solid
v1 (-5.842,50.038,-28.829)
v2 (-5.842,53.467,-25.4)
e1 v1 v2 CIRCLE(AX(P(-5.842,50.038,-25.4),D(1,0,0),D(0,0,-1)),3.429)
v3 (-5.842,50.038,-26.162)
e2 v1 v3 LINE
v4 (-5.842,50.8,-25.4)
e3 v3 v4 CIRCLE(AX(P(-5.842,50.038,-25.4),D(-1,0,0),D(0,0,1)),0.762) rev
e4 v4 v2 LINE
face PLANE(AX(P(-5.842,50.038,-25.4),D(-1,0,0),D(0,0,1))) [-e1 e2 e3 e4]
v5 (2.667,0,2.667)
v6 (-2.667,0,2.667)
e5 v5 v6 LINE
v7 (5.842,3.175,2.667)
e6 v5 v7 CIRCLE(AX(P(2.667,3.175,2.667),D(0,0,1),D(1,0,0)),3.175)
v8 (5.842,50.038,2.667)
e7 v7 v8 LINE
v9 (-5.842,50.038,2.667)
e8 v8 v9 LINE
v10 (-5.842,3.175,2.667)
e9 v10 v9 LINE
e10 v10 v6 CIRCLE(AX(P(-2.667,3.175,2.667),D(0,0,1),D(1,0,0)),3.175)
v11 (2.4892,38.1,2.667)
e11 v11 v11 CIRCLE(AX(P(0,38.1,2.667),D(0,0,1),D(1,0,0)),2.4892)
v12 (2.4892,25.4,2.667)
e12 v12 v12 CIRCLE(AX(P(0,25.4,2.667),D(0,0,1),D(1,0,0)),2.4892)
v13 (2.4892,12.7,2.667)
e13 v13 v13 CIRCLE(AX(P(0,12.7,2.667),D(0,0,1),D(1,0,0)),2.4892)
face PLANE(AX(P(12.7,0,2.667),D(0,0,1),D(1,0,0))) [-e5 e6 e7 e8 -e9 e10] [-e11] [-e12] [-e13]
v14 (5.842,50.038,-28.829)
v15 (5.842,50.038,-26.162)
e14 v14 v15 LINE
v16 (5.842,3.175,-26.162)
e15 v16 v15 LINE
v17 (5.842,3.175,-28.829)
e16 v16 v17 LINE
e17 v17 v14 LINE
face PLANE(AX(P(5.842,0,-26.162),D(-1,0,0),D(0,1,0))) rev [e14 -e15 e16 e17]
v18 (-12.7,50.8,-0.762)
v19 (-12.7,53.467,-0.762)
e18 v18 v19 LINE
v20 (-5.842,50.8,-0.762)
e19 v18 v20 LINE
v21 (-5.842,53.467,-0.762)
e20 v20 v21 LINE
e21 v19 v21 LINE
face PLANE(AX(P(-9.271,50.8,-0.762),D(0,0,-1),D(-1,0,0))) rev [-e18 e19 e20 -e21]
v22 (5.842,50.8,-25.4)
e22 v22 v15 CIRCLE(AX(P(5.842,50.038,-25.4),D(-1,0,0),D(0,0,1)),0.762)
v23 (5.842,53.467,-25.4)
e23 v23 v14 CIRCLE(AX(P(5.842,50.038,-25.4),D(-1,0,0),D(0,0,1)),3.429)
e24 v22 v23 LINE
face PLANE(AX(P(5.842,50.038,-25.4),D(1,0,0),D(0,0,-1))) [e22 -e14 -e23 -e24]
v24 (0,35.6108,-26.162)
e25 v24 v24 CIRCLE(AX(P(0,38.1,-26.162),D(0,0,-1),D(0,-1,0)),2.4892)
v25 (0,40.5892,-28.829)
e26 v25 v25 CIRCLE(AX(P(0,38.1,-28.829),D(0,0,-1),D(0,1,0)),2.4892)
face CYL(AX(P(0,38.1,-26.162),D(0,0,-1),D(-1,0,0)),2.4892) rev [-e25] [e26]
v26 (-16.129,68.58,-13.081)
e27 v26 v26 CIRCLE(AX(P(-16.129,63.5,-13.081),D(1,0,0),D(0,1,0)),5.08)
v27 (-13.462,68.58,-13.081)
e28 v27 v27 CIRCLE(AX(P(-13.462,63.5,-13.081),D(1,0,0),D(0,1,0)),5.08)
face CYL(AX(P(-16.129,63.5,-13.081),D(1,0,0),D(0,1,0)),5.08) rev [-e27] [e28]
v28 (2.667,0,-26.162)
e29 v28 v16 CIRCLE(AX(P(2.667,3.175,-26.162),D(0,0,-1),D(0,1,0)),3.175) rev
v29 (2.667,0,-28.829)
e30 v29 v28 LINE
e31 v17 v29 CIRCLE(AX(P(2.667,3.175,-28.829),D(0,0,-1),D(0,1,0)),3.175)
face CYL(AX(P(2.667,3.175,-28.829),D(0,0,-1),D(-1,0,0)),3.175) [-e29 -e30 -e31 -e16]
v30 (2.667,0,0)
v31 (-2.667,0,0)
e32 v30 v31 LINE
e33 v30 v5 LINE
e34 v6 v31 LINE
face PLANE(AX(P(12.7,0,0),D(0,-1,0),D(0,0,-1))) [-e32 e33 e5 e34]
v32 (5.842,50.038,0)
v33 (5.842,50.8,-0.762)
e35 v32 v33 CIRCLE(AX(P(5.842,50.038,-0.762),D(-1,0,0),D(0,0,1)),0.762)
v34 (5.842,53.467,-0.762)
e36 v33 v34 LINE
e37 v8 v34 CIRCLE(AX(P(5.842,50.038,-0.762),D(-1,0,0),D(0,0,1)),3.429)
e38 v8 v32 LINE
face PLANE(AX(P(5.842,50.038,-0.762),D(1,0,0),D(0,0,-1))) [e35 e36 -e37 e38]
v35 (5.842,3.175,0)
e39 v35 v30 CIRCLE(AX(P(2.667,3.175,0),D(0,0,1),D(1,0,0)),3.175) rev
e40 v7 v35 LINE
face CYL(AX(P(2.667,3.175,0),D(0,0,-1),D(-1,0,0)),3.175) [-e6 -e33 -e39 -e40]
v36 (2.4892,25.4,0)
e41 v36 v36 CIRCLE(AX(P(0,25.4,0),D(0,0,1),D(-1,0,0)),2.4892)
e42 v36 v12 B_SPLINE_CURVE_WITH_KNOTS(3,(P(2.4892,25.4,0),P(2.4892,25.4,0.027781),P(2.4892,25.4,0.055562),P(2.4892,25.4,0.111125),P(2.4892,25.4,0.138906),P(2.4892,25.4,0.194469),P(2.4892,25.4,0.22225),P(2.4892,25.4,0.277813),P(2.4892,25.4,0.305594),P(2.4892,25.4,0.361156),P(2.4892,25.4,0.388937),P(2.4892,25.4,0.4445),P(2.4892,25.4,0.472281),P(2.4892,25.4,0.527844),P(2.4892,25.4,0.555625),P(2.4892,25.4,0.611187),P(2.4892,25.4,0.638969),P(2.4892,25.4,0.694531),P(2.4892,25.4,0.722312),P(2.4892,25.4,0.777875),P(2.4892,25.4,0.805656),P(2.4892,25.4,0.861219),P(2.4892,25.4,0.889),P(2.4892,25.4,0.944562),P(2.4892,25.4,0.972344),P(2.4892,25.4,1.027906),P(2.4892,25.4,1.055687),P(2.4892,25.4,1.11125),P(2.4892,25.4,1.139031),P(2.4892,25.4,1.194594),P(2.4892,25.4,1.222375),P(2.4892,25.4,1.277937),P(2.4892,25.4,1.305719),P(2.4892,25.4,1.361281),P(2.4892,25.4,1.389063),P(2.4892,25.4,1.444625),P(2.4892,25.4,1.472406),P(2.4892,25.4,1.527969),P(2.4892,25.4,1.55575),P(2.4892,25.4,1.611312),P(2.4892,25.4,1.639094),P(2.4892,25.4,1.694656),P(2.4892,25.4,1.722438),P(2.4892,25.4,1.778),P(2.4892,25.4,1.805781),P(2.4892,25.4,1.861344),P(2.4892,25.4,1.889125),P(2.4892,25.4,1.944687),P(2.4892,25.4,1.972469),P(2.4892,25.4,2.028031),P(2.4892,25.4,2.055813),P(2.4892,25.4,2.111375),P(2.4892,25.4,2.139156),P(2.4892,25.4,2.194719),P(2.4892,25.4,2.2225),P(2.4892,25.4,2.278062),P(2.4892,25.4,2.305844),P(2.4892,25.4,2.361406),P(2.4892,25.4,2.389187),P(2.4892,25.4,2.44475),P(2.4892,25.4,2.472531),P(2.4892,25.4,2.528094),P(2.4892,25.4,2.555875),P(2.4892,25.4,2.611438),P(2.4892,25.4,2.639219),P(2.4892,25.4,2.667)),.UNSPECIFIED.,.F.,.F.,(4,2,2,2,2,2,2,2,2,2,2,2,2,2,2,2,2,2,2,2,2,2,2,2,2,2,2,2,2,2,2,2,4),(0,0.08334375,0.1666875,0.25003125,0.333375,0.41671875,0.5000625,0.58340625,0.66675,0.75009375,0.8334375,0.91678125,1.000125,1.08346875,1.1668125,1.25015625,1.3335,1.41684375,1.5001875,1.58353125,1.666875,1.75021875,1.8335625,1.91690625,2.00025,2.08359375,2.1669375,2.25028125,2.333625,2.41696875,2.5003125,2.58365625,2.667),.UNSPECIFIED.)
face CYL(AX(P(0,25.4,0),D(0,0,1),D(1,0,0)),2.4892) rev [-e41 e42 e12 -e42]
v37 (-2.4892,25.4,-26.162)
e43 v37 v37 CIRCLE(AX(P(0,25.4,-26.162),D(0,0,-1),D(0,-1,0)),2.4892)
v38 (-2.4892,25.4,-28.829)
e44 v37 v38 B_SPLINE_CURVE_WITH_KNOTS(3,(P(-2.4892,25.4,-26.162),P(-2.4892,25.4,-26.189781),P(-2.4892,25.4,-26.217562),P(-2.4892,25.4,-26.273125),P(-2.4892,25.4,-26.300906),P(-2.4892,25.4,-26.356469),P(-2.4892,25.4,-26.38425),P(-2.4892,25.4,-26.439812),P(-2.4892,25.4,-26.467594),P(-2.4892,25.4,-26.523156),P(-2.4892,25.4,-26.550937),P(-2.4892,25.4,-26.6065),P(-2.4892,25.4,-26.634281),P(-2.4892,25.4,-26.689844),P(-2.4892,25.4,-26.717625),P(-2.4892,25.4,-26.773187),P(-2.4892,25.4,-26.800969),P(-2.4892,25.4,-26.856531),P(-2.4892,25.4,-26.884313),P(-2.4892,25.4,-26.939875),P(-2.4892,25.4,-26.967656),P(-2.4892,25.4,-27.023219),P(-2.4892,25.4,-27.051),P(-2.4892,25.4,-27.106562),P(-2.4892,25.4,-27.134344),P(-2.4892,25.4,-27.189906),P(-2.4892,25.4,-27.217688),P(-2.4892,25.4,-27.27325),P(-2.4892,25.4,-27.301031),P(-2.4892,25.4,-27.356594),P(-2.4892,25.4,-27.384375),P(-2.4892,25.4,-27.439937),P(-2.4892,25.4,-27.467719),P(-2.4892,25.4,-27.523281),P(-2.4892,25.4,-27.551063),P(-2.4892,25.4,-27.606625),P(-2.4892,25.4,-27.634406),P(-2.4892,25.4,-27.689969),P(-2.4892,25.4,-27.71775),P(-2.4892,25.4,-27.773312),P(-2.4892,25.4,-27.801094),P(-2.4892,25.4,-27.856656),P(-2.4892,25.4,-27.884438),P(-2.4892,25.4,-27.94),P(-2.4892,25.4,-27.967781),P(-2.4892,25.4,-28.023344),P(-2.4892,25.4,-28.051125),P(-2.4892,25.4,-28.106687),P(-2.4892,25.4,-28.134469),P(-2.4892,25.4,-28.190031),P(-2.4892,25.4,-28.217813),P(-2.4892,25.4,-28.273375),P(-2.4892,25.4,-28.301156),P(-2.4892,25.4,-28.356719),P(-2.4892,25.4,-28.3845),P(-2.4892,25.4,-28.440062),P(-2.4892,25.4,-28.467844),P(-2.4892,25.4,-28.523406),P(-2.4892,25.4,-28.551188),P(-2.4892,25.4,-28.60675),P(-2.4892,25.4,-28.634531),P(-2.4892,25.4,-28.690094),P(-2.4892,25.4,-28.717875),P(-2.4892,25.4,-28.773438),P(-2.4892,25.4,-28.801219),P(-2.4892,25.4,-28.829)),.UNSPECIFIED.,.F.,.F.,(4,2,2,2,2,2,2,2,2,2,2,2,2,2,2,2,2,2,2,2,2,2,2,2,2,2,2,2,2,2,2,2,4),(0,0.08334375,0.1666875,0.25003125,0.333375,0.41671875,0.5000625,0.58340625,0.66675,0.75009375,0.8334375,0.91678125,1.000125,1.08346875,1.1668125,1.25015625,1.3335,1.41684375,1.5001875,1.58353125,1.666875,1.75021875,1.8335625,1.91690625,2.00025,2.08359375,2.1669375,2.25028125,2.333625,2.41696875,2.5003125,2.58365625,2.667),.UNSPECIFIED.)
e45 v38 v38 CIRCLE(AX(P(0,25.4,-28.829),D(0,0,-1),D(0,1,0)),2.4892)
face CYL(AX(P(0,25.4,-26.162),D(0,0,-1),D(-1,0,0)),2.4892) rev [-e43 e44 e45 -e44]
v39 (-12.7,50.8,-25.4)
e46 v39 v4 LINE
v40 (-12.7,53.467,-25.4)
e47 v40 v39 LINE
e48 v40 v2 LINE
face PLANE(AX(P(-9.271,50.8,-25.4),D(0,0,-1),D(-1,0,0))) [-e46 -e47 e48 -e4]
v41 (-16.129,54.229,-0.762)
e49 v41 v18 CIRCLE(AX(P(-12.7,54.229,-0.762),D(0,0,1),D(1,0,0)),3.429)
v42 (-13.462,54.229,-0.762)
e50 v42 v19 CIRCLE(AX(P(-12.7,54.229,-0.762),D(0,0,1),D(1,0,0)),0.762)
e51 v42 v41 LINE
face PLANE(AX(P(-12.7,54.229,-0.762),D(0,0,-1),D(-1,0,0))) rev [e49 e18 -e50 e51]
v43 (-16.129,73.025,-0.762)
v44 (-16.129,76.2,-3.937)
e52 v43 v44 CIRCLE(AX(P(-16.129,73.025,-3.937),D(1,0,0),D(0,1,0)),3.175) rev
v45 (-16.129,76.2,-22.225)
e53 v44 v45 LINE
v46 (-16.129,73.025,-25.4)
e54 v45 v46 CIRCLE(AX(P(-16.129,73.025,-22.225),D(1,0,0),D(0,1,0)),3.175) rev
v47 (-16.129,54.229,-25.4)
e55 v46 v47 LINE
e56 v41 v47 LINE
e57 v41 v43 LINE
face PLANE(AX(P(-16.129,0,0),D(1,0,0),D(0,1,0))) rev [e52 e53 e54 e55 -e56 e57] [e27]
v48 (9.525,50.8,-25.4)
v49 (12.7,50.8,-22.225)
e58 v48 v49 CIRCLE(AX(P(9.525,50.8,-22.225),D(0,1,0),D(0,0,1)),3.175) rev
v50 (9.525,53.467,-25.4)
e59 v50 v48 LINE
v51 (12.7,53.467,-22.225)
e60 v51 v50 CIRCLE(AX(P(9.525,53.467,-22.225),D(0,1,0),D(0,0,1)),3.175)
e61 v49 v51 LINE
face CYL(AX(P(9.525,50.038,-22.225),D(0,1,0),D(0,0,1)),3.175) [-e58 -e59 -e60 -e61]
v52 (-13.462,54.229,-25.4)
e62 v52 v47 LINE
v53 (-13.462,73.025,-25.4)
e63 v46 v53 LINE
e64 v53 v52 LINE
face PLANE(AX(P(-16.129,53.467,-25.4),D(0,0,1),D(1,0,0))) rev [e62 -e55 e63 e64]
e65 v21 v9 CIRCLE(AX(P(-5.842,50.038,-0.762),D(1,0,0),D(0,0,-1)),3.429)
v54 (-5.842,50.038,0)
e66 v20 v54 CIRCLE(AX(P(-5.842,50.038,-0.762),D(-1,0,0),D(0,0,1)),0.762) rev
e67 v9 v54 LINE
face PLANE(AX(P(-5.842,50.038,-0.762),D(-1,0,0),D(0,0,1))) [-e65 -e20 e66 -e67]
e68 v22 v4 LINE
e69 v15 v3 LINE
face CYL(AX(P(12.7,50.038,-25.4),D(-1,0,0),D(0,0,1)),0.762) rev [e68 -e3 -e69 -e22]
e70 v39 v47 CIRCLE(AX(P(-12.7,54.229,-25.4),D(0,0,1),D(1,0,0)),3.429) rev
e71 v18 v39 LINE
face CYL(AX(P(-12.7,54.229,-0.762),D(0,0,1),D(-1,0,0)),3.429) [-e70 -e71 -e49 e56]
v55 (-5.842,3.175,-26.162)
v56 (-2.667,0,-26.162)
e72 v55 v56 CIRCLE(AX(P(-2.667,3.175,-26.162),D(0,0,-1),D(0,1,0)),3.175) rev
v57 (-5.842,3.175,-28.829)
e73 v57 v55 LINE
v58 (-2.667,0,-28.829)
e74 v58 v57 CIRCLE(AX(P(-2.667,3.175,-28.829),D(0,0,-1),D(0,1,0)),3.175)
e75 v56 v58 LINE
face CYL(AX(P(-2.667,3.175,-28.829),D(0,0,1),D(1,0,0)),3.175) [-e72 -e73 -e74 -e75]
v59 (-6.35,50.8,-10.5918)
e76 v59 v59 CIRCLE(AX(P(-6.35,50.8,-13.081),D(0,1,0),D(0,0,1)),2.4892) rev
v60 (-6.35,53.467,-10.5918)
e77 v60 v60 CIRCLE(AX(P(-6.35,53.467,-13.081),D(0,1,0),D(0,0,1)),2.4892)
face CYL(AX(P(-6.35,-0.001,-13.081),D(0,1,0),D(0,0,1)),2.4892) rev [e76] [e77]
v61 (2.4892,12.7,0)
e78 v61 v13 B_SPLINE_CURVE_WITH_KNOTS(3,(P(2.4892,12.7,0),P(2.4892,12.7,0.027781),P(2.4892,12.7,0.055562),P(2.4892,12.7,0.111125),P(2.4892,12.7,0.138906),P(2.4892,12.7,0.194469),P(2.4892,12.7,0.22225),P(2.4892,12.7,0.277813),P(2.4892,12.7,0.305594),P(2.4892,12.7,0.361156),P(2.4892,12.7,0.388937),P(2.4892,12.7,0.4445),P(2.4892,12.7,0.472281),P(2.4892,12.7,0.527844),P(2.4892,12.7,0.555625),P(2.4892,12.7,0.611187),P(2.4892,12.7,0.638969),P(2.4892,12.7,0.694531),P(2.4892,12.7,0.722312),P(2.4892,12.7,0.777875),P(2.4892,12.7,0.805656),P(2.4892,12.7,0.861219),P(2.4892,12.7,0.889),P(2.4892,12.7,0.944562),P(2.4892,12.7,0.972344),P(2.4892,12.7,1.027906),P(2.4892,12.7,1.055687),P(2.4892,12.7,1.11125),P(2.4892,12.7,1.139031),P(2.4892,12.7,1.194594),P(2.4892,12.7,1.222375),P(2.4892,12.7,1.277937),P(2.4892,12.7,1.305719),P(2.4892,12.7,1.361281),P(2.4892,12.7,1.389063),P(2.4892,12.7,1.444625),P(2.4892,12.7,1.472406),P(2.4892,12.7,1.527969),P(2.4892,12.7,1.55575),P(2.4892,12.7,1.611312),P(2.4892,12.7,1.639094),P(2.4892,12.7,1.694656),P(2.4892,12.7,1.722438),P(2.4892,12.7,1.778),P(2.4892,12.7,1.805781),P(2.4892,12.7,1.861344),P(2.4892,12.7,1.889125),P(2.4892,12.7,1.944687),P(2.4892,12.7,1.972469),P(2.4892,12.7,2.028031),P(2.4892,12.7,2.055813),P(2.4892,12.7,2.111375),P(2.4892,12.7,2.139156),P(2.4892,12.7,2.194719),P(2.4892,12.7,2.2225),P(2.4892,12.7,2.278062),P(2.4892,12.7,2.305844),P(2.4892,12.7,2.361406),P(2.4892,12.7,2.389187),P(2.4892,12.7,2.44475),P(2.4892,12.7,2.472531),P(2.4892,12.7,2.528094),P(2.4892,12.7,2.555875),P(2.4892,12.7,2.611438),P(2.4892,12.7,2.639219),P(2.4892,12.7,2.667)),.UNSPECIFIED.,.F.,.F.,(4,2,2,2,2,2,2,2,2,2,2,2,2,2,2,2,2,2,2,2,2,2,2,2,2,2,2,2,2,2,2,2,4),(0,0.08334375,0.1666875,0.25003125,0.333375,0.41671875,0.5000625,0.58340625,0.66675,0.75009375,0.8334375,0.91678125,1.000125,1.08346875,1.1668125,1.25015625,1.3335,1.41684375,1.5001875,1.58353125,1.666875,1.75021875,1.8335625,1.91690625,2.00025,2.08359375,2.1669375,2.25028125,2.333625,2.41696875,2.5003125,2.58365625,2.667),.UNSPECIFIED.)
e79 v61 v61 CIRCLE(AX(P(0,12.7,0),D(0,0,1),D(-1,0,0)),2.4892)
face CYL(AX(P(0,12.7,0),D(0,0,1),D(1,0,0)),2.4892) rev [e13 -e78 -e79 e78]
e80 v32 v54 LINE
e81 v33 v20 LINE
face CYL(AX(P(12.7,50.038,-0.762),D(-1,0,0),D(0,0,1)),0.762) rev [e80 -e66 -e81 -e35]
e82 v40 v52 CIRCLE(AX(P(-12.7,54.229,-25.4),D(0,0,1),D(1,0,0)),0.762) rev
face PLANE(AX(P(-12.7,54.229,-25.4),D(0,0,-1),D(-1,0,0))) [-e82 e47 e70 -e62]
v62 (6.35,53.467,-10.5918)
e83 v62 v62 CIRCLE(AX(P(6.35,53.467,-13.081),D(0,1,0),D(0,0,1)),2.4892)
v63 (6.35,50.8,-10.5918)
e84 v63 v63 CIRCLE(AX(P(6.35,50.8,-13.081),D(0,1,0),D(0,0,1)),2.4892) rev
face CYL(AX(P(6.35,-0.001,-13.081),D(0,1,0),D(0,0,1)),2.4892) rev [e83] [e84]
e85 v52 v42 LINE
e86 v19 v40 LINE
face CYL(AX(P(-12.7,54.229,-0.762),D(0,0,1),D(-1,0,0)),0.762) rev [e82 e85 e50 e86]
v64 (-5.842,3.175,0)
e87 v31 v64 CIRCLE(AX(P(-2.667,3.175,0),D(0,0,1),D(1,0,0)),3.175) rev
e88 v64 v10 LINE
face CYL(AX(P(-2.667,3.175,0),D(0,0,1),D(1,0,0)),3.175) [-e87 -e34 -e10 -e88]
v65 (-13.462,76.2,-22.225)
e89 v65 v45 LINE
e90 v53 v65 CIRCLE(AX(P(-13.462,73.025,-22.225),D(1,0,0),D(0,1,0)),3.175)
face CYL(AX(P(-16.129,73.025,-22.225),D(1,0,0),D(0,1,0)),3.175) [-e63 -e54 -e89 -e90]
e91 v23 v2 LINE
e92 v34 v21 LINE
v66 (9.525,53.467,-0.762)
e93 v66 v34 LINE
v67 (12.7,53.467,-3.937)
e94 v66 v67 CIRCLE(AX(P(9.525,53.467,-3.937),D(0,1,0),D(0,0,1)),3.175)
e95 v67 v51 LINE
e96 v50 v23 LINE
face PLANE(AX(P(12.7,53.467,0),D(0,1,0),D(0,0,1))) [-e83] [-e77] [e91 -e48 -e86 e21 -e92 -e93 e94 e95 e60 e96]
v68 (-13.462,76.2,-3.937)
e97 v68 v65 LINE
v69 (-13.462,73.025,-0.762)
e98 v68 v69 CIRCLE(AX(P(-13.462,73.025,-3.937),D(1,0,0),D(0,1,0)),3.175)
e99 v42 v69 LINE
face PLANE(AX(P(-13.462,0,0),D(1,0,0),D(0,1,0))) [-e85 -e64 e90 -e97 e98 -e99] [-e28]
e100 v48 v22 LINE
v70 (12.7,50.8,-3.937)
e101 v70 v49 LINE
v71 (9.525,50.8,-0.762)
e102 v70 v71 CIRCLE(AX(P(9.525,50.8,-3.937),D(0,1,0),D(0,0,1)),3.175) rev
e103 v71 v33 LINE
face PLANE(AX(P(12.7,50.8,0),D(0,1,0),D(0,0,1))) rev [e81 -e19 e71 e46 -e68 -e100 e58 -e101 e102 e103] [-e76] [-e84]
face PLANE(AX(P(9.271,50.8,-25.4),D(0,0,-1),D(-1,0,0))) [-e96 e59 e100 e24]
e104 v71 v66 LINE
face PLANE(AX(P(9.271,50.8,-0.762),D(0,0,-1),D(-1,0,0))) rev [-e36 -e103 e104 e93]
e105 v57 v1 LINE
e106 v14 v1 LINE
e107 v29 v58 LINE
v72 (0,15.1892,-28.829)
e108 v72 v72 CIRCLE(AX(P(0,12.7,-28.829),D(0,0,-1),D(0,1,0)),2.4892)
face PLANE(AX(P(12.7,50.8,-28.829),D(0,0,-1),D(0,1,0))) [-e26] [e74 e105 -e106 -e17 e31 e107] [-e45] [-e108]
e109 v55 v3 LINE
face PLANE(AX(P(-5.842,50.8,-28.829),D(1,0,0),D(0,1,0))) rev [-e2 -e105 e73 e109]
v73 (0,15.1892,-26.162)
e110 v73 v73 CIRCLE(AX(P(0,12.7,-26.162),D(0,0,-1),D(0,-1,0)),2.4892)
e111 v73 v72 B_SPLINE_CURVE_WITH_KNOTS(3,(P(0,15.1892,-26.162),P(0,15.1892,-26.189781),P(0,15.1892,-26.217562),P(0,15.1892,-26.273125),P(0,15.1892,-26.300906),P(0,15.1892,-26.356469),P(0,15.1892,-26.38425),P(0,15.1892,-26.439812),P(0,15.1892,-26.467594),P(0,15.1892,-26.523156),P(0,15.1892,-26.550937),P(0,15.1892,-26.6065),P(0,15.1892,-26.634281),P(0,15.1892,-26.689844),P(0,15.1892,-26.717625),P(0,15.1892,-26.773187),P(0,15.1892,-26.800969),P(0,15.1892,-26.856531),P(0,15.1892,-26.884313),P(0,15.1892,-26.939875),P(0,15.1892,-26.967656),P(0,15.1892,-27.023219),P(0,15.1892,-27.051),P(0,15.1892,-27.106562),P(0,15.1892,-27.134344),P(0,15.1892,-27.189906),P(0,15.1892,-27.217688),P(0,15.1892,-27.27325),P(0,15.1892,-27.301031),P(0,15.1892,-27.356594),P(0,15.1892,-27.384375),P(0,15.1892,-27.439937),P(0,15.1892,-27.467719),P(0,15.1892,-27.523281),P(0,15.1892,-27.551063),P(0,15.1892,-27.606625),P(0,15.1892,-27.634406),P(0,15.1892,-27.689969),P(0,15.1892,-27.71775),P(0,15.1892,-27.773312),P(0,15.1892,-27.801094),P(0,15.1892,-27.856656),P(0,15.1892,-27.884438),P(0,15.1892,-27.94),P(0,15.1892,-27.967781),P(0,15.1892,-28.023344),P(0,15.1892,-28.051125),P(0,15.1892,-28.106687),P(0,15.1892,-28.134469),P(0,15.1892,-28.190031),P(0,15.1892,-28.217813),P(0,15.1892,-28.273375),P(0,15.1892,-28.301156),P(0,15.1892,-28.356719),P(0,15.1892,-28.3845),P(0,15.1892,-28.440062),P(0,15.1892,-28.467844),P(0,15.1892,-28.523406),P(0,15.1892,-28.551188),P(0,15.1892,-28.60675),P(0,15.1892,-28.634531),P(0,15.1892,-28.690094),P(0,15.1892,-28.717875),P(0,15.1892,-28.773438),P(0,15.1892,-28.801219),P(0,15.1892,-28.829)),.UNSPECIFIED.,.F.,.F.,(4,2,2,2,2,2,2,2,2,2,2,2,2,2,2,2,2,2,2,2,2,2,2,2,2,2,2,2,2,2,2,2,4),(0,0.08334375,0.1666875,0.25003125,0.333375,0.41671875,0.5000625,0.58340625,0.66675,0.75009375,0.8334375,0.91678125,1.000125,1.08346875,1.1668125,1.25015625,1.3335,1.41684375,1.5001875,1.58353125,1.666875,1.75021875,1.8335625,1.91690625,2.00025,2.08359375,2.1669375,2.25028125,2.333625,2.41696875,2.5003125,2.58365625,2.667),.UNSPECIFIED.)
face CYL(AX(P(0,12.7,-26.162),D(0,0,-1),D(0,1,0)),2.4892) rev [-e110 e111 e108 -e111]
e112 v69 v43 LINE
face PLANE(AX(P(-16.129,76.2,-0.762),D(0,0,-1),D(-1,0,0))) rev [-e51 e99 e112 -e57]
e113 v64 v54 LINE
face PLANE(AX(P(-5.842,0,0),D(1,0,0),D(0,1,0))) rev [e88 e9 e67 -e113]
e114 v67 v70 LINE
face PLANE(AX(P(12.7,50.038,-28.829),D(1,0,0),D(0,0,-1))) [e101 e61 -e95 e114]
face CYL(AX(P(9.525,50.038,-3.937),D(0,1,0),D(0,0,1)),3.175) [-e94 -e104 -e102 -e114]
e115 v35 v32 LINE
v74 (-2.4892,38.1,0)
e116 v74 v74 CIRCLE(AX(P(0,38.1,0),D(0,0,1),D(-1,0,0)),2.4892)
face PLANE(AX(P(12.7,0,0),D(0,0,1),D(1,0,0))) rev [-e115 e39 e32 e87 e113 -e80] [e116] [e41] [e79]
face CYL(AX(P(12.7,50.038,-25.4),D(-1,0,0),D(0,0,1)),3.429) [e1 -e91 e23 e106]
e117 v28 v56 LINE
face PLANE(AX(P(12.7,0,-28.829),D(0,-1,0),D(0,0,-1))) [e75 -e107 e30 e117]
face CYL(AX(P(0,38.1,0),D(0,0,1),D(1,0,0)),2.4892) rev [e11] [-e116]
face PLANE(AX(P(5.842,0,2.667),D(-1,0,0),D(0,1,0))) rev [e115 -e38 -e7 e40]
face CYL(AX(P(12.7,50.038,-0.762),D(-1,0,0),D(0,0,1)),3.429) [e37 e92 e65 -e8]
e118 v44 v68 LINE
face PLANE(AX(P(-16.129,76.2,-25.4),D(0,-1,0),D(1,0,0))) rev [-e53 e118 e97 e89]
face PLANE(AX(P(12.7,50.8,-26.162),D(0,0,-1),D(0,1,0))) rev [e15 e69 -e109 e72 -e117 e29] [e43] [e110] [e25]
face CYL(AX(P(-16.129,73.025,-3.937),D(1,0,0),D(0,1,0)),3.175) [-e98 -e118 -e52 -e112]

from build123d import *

# Parameters (mm, degrees)
BASE_FLANGE1_START       = -12.7
BASE_FLANGE1_DEPTH       = 25.4
EDGE_FLANGE1_DEPTH       = 24.638
SKETCH9_R                = 5.08
CUT_EXTRUDE1_DEPTH       = 86.568694538
CUT_EXTRUDE2_START       = -12.7
CUT_EXTRUDE2_DEPTH       = 6.858
CUT_EXTRUDE2_START_2     = 5.842
CUT_EXTRUDE2_2_DEPTH     = 6.858
CUT_EXTRUDE2_START_3     = -28.829
CUT_EXTRUDE2_3_OUTLINE_R = 2.4892
CUT_EXTRUDE2_3_DEPTH     = 31.496
CUT_EXTRUDE3_REACH       = 64.849
SKETCH11_R               = 2.4892
FILLET1_R                = 3.175


with BuildPart() as part:
    # Base-Flange1: read off the stored shape, not the designer's step
    # Base-Flange1 outline → Base-Flange1 (new body)
    with BuildSketch(Plane(origin=(0, 0, 0), x_dir=(0, 0, -1), z_dir=(1, 0, 0)).offset(BASE_FLANGE1_START)):
        with BuildLine():
            Line((26.162, 50.038), (26.162, 0))
            Line((26.162, 0), (28.829, 0))
            Line((28.829, 0), (28.829, 50.038))
            ThreePointArc((28.829, 50.038), (27.824669153, 52.462669153), (25.4, 53.467))
            Line((25.4, 53.467), (0.762, 53.467))
            ThreePointArc((0.762, 53.467), (-1.662669153, 52.462669153), (-2.667, 50.038))
            Line((-2.667, 50.038), (-2.667, 0))
            Line((-2.667, 0), (0, 0))
            Line((0, 0), (0, 50.038))
            ThreePointArc((0, 50.038), (0.223184633, 50.576815367), (0.762, 50.8))
            Line((0.762, 50.8), (25.4, 50.8))
            ThreePointArc((25.4, 50.8), (25.938815367, 50.576815367), (26.162, 50.038))
        make_face()
    extrude(amount=BASE_FLANGE1_DEPTH)

    # Edge-Flange1: sheet metal written as solids
    # Edge-Flange1 section (on a plane across the edge) → Edge-Flange1 (add)
    with BuildSketch(Plane(origin=(-13.462, 53.467, -25.4), x_dir=(1, 0, 0), z_dir=(0, 0, 1))):
        with BuildLine():
            Line((-2.667, 0.762), (-2.667, 22.733))
            Line((-2.667, 22.733), (0, 22.733))
            Line((0, 22.733), (0, 0.762))
            ThreePointArc((0, 0.762), (0.223184633, 0.223184633), (0.762, 0))
            Line((0.762, 0), (0.762, -2.667))
            ThreePointArc((0.762, -2.667), (-1.662669153, -1.662669153), (-2.667, 0.762))
        make_face()
    extrude(amount=EDGE_FLANGE1_DEPTH)

    # Sketch9 → Cut-Extrude1 (cut, through all)
    with BuildSketch(Plane(origin=(-13.462, 0, 0), x_dir=(0, 0, -1), z_dir=(1, 0, 0))):
        with Locations(Location((13.081, 63.5, 0), (0, 0, 90))):
            Circle(SKETCH9_R)
    extrude(amount=-CUT_EXTRUDE1_DEPTH, mode=Mode.SUBTRACT)

    # Cut-Extrude2: read off the stored shape, not the designer's step
    # Cut-Extrude2 outline → Cut-Extrude2 (cut)
    with BuildSketch(Plane.YZ.offset(CUT_EXTRUDE2_START)):
        with BuildLine():
            Line((53.467, -25.4), (50.8, -25.4))
            ThreePointArc((50.8, -25.4), (50.576815367, -25.938815367), (50.038, -26.162))
            Line((50.038, -26.162), (0, -26.162))
            Line((0, -26.162), (0, -28.829))
            Line((0, -28.829), (50.038, -28.829))
            ThreePointArc((50.038, -28.829), (52.462669153, -27.824669153), (53.467, -25.4))
        make_face()
        with BuildLine():
            ThreePointArc((50.038, 0), (50.576815367, -0.223184633), (50.8, -0.762))
            Line((50.8, -0.762), (53.467, -0.762))
            ThreePointArc((53.467, -0.762), (52.462669153, 1.662669153), (50.038, 2.667))
            Line((50.038, 2.667), (0, 2.667))
            Line((0, 2.667), (0, 0))
            Line((0, 0), (50.038, 0))
        make_face()
    extrude(amount=CUT_EXTRUDE2_DEPTH, mode=Mode.SUBTRACT)

    # Cut-Extrude2 2 outline → Cut-Extrude2 2 (cut)
    with BuildSketch(Plane.YZ.offset(CUT_EXTRUDE2_START_2)):
        with BuildLine():
            Line((53.467, -25.4), (50.8, -25.4))
            ThreePointArc((50.8, -25.4), (50.576815367, -25.938815367), (50.038, -26.162))
            Line((50.038, -26.162), (0, -26.162))
            Line((0, -26.162), (0, -28.829))
            Line((0, -28.829), (50.038, -28.829))
            ThreePointArc((50.038, -28.829), (52.462669153, -27.824669153), (53.467, -25.4))
        make_face()
        with BuildLine():
            ThreePointArc((50.038, 0), (50.576815367, -0.223184633), (50.8, -0.762))
            Line((50.8, -0.762), (53.467, -0.762))
            ThreePointArc((53.467, -0.762), (52.462669153, 1.662669153), (50.038, 2.667))
            Line((50.038, 2.667), (0, 2.667))
            Line((0, 2.667), (0, 0))
            Line((0, 0), (50.038, 0))
        make_face()
    extrude(amount=CUT_EXTRUDE2_2_DEPTH, mode=Mode.SUBTRACT)

    # Cut-Extrude2 3 outline → Cut-Extrude2 3 (cut)
    with BuildSketch(Plane.XY.offset(CUT_EXTRUDE2_START_3)):
        with Locations((0, 12.7)):
            Circle(CUT_EXTRUDE2_3_OUTLINE_R)
        with Locations((0, 38.1)):
            Circle(CUT_EXTRUDE2_3_OUTLINE_R)
        with Locations((0, 25.4)):
            Circle(CUT_EXTRUDE2_3_OUTLINE_R)
    extrude(amount=CUT_EXTRUDE2_3_DEPTH, mode=Mode.SUBTRACT)

    # Sketch11 → Cut-Extrude3 (cut, up to next)
    with BuildSketch(Plane(origin=(0, 53.467, 0), x_dir=(1, 0, 0), z_dir=(0, 1, 0)), mode=Mode.PRIVATE) as cut_extrude3_sk1:
        with Locations(Location((-6.35, 13.081, 0), (0, 0, 270))):
            Circle(SKETCH11_R)
    cut_extrude3_tool1 = extrude(cut_extrude3_sk1.sketch, amount=-CUT_EXTRUDE3_REACH, mode=Mode.PRIVATE) & part.part
    # Sketch11 → Cut-Extrude3 (cut, up to next)
    with BuildSketch(Plane(origin=(0, 53.467, 0), x_dir=(1, 0, 0), z_dir=(0, 1, 0)), mode=Mode.PRIVATE) as cut_extrude3_sk2:
        with Locations(Location((6.35, 13.081, 0), (0, 0, 270))):
            Circle(SKETCH11_R)
    cut_extrude3_tool2 = extrude(cut_extrude3_sk2.sketch, amount=-CUT_EXTRUDE3_REACH, mode=Mode.PRIVATE) & part.part
    add(cut_extrude3_tool1.solids().sort_by_distance((-6.35, 53.467, -13.081))[0], mode=Mode.SUBTRACT)
    add(cut_extrude3_tool2.solids().sort_by_distance((6.35, 53.467, -13.081))[0], mode=Mode.SUBTRACT)

    # Fillet1
    fillet1_edges = [part.edges().sort_by_distance(p)[0] for p in [
        (5.842, 0, 1.3335),
        (-5.842, 0, 1.3335),
        (5.842, 0, -27.4955),
        (-5.842, 0, -27.4955),
        (12.7, 52.1335, -25.4),
        (12.7, 52.1335, -0.762),
        (-14.7955, 76.2, -25.4),
        (-14.7955, 76.2, -0.762),
    ]]
    fillet(fillet1_edges, radius=FILLET1_R)


solid = part.part
